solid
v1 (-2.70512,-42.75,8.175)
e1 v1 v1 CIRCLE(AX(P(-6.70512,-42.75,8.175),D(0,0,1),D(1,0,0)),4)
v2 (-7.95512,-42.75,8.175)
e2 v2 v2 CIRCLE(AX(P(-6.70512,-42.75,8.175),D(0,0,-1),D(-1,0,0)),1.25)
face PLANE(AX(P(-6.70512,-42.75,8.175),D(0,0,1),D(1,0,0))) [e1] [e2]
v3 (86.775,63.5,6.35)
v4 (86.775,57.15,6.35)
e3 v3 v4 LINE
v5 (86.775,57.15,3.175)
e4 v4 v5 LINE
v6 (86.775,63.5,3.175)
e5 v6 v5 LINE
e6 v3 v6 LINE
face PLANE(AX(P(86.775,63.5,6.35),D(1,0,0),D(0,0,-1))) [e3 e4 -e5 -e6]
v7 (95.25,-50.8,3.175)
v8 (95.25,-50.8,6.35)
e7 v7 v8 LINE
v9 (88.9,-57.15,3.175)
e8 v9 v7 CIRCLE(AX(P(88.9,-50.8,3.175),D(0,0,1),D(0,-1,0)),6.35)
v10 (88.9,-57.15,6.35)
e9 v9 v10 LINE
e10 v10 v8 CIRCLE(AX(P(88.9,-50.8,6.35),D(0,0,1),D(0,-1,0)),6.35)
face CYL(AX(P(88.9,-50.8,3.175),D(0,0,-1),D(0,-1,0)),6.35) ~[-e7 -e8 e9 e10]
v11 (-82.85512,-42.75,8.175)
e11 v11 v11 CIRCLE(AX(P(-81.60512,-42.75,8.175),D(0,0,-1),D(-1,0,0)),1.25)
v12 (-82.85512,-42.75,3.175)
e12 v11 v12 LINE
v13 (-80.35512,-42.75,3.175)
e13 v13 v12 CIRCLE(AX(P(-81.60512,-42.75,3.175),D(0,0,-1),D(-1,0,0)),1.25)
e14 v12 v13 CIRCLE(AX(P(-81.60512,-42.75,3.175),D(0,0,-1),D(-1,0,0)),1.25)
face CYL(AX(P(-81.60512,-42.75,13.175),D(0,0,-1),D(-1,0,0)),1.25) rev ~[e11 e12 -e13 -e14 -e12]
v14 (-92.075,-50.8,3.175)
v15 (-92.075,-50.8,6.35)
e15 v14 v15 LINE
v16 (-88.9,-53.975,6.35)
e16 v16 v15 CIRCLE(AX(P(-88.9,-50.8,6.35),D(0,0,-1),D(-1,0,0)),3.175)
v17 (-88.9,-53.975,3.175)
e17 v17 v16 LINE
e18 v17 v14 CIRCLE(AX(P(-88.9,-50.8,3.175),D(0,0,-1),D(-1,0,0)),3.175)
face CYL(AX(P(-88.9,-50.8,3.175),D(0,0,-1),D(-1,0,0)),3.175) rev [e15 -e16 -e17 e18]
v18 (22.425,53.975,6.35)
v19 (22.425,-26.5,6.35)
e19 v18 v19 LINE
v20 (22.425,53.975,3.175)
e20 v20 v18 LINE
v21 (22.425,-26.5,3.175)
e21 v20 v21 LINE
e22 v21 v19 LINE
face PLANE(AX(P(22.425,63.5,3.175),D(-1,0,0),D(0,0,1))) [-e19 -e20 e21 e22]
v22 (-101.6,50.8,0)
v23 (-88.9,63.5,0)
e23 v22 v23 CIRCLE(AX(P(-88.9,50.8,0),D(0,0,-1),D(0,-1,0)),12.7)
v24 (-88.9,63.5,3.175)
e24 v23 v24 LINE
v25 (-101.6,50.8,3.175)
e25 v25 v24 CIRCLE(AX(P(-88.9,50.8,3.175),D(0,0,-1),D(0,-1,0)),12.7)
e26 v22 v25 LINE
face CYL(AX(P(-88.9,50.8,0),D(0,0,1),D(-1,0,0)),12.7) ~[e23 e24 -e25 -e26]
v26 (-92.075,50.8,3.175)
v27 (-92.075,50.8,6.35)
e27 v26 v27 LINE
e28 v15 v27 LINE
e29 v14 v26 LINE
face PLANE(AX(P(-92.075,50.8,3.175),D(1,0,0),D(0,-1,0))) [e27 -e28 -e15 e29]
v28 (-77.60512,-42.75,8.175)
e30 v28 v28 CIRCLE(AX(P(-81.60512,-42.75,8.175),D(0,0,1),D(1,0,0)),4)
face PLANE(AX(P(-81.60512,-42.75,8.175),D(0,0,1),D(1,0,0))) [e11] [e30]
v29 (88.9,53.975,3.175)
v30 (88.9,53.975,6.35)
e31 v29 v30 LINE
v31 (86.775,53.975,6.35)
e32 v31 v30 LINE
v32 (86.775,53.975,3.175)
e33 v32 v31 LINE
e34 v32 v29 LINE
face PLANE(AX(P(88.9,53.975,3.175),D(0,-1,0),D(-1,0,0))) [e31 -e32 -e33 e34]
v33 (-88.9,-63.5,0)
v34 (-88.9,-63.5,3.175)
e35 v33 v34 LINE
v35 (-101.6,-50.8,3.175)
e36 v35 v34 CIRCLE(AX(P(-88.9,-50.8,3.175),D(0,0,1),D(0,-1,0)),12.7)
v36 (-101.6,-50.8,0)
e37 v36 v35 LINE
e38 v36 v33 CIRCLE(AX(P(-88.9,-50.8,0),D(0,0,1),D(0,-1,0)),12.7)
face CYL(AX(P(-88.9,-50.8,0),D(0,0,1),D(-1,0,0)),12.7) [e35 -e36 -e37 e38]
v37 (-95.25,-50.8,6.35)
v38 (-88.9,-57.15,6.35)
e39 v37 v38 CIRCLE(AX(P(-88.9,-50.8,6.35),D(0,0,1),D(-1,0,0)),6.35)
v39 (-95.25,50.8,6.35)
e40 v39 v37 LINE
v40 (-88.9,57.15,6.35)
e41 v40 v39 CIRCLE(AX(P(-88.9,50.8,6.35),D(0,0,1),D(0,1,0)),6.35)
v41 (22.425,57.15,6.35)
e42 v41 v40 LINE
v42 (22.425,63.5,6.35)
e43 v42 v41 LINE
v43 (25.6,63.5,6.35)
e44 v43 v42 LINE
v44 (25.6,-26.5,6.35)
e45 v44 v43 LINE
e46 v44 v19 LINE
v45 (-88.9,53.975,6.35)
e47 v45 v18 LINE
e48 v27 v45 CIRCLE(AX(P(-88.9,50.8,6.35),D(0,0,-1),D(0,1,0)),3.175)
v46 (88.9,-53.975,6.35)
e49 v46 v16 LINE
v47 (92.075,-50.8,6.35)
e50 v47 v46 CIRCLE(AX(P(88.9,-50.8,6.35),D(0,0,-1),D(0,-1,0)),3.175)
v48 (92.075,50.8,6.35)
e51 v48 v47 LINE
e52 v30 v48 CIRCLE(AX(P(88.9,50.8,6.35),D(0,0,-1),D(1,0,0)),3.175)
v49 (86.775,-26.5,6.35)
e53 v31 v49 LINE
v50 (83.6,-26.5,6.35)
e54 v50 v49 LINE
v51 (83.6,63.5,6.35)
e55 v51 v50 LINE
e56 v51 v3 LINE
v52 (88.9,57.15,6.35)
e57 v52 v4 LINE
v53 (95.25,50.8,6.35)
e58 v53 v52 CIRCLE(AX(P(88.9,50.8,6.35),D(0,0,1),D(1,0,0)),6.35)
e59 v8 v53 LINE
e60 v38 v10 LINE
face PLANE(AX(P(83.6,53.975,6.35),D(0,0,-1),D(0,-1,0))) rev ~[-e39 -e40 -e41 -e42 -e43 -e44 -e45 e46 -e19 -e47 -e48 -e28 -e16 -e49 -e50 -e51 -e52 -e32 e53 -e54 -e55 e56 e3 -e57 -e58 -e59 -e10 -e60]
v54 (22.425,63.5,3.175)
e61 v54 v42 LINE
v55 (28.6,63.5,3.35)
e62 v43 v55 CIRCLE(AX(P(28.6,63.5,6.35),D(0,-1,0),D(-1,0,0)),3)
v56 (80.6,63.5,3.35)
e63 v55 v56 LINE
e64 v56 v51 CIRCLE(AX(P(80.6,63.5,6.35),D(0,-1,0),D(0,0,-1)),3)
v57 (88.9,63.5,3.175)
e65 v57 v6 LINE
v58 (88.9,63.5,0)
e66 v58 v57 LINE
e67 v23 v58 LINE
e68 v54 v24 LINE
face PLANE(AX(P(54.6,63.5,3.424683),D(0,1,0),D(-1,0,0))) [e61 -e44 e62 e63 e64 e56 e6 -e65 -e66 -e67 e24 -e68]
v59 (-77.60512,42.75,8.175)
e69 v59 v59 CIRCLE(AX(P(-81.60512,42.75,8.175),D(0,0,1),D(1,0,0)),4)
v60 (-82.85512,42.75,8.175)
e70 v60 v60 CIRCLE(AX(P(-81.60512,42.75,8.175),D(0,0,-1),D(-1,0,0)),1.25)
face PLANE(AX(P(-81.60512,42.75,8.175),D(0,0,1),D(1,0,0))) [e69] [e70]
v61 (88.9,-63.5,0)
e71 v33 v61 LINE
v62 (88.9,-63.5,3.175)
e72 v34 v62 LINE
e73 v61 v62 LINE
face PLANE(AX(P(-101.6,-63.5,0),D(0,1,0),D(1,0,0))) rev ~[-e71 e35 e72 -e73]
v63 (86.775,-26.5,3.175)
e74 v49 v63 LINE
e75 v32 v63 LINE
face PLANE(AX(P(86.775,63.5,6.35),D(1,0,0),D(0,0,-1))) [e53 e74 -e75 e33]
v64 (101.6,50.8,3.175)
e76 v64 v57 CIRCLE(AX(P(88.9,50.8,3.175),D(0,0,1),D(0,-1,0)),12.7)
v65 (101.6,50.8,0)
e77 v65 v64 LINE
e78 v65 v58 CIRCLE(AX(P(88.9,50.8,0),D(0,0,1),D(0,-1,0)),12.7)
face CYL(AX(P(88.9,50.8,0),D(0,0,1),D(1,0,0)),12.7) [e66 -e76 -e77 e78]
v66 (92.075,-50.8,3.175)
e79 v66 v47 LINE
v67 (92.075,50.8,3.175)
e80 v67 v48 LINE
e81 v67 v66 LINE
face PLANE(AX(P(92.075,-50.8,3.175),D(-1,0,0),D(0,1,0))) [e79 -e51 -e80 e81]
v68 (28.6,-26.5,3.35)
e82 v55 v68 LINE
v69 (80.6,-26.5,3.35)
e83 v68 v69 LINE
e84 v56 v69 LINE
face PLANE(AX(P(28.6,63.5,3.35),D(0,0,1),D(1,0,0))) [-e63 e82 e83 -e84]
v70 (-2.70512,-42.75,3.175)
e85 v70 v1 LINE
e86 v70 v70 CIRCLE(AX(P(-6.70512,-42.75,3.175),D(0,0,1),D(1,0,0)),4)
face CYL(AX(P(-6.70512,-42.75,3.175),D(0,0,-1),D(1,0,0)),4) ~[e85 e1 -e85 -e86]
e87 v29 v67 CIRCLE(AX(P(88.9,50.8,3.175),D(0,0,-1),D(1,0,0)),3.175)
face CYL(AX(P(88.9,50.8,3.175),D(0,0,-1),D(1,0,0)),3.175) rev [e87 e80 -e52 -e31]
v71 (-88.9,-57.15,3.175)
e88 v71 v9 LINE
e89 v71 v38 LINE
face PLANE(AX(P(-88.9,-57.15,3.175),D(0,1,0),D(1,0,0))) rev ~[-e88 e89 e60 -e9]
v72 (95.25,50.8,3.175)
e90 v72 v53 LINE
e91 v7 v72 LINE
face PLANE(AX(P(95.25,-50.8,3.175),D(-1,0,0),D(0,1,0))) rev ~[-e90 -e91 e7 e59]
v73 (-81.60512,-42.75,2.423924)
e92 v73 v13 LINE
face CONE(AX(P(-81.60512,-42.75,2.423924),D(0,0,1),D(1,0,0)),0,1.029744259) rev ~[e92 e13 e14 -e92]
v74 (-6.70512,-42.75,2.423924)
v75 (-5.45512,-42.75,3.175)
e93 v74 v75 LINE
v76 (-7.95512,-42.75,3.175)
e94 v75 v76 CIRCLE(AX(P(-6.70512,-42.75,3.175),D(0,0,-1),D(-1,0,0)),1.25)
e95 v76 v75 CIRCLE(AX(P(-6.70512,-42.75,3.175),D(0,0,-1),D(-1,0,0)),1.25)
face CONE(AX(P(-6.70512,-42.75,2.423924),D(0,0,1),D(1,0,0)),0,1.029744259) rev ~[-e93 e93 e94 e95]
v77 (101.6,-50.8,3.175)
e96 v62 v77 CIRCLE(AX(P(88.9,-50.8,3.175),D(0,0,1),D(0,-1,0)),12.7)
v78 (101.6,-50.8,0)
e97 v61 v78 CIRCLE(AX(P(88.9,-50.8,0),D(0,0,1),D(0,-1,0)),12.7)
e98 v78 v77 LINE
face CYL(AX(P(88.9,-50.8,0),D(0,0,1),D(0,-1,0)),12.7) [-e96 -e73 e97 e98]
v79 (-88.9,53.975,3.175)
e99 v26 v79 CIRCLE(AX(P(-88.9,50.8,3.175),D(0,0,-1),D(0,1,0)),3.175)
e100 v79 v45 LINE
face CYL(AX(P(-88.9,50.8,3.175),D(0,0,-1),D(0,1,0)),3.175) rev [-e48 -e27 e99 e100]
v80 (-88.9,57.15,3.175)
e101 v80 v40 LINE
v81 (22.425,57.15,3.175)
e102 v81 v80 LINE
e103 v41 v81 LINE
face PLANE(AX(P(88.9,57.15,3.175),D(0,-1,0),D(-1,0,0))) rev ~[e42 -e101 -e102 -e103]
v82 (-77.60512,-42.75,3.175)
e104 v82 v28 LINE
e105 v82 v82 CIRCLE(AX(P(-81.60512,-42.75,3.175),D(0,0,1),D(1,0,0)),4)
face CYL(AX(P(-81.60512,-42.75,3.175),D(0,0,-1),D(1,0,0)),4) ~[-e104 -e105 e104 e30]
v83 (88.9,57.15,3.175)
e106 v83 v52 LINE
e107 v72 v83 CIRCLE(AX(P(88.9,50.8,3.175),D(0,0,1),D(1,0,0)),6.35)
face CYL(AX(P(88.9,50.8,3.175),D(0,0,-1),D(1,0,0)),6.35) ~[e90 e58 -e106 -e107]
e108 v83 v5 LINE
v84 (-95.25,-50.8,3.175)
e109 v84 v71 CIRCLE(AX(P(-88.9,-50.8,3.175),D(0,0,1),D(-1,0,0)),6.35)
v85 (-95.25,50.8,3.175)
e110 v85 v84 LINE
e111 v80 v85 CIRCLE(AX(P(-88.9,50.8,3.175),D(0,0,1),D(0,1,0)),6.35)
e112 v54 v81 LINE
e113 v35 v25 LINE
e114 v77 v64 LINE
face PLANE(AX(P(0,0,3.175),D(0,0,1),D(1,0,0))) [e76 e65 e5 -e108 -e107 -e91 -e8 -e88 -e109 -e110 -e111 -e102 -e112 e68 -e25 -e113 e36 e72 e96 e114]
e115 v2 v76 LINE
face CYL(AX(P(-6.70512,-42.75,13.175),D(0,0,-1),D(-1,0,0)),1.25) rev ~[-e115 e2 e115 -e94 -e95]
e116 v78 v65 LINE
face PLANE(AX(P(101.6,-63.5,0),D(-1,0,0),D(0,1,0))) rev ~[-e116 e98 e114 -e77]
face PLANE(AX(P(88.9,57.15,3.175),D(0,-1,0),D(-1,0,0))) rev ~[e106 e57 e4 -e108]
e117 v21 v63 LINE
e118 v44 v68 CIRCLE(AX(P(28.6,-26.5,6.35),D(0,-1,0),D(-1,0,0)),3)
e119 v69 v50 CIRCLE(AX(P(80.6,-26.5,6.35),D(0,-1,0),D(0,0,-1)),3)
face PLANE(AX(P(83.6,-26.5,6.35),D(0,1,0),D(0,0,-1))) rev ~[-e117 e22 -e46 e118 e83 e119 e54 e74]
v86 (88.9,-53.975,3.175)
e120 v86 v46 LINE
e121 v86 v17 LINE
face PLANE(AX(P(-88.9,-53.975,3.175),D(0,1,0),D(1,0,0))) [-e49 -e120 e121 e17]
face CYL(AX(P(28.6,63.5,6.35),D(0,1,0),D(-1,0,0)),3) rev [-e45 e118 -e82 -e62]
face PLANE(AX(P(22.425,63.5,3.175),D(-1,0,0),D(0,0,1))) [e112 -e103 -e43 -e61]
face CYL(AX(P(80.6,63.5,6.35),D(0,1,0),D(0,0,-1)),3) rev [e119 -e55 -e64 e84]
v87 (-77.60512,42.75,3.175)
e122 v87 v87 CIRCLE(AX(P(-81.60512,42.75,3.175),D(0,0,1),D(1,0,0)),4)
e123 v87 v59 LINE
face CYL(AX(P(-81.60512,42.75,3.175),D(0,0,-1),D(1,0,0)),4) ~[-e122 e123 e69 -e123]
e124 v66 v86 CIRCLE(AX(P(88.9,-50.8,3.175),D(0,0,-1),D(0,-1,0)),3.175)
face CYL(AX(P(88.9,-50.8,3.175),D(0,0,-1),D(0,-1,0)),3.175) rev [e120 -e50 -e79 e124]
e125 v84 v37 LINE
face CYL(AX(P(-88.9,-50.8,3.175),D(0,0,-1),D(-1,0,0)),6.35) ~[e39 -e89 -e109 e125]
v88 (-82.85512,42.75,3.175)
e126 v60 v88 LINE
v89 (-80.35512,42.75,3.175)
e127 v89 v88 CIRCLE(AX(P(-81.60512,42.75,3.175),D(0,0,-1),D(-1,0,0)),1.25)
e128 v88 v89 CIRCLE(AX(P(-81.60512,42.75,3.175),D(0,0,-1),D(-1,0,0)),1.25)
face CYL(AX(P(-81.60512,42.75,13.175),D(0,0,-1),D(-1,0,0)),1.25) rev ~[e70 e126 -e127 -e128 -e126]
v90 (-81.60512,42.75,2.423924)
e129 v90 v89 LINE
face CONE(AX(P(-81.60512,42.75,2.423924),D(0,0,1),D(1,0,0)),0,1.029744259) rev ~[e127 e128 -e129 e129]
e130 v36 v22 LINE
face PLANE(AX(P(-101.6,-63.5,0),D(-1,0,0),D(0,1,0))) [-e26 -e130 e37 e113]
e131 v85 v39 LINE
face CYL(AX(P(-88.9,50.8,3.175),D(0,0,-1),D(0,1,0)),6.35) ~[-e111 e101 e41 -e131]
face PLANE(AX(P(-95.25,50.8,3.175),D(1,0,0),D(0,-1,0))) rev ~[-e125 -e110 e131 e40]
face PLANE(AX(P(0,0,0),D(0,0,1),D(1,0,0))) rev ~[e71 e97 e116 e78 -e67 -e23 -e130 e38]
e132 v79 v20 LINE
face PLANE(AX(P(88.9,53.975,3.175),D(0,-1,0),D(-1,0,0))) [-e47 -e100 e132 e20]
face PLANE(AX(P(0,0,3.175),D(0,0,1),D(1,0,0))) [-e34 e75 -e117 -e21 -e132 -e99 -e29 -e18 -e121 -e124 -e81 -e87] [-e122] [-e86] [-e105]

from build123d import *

# Parameters (mm, degrees)
F0_W             = 203.2
F0_H             = 127
F1_DEPTH         = 3.175
F2_R             = 12.7
F4_DEPTH         = 3.175
F5_T             = -3.175
F6_W             = 58
F6_H             = 9.525
F7_DEPTH         = 3.176
F9_DEPTH         = 90
F10_DEPTH        = 3.175
F11_DEPTH        = 3.175
F12_R            = 4
F13_DEPTH        = 5
F17_D            = 2.5
F17_DEPTH        = 5
F17_TIP          = 0.7510757738
F17_ON_F15_D     = 2.5
F17_ON_F15_DEPTH = 5
F17_ON_F15_TIP   = 0.7510757738
F17_ON_F16_D     = 2.5
F17_ON_F16_DEPTH = 5
F17_ON_F16_TIP   = 0.7510757738


# Not quite as in the source:
# - a feature names something its author has since deleted; it is built from what else it names


with BuildPart() as f1:
    # F0 (on Top) → F1 (new body)
    with BuildSketch(Plane.XY):
        Rectangle(F0_W, F0_H)
    extrude(amount=F1_DEPTH)

    # F2
    f2_edges = [f1.edges().sort_by_distance(p)[0] for p in [
        (-101.6, -63.5, 1.5875),
        (-101.6, 63.5, 1.5875),
        (101.6, -63.5, 1.5875),
        (101.6, 63.5, 1.5875),
    ]]
    fillet(f2_edges, radius=F2_R)

    # F3 (on face) → F4 (join)
    with BuildSketch(Plane.XY.offset(3.175)):
        with BuildLine():
            Line((88.9, 57.15), (-88.9, 57.15))
            ThreePointArc((-88.9, 57.15), (-93.3901280605, 55.2901280605), (-95.25, 50.8))
            Line((-95.25, 50.8), (-95.25, -50.8))
            ThreePointArc((-95.25, -50.8), (-93.3901280605, -55.2901280605), (-88.9, -57.15))
            Line((-88.9, -57.15), (88.9, -57.15))
            ThreePointArc((88.9, -57.15), (93.3901280605, -55.2901280605), (95.25, -50.8))
            Line((95.25, -50.8), (95.25, 50.8))
            ThreePointArc((95.25, 50.8), (93.3901280605, 55.2901280605), (88.9, 57.15))
        make_face()
    extrude(amount=F4_DEPTH)

    # F5
    f5_openings = [f1.faces().sort_by_distance(p)[0] for p in [
        (0, 0, 6.35),
    ]]
    offset(amount=F5_T, openings=f5_openings, kind=Kind.INTERSECTION)

    # F6 (on face) → F7 (cut, through all)
    with BuildSketch(Plane.XY.offset(3.175)):
        with Locations((54.6, 58.7375)):
            Rectangle(F6_W, F6_H)
    extrude(amount=F7_DEPTH, mode=Mode.SUBTRACT)

    # F8 (on face) → F9 (join)
    with BuildSketch(Plane(origin=(0, 63.5, 0), x_dir=(-1, 0, 0), z_dir=(0, 1, 0))):
        with BuildLine():
            Line((-83.6, 6.35), (-83.6, 3.175))
            Line((-83.6, 3.175), (-25.6, 3.175))
            Line((-25.6, 3.175), (-25.6, 6.35))
            ThreePointArc((-25.6, 6.35), (-26.4786796564, 4.2286796564), (-28.6, 3.35))
            Line((-28.6, 3.35), (-80.6, 3.35))
            ThreePointArc((-80.6, 3.35), (-82.7213203436, 4.2286796564), (-83.6, 6.35))
        make_face()
    extrude(amount=-F9_DEPTH)

    # F10 (add): faces of the model
    f10_faces = [f1.faces().sort_by_distance(p)[0] for p in [
        (25.6, 13.7375, 4.7625),
        (25.6, 60.325, 4.7625),
    ]]
    extrude(f10_faces, amount=F10_DEPTH)

    # F11 (add): faces of the model
    f11_faces = [f1.faces().sort_by_distance(p)[0] for p in [
        (83.6, 13.7375, 4.7625),
        (83.6, 60.325, 4.7625),
    ]]
    extrude(f11_faces, amount=F11_DEPTH)

    # F12 (on face) → F13 (join)
    with BuildSketch(Plane.XY.offset(3.175)):
        with Locations((-81.6051200401, -42.75)):
            Circle(F12_R)
        with Locations((-6.7051200401, -42.75)):
            Circle(F12_R)
        with Locations((-81.6051200401, 42.75)):
            Circle(F12_R)
    extrude(amount=F13_DEPTH)

    # F17
    with Locations(Plane.XY.offset(8.175)):
        with Locations((-81.6051200401, 42.75)):
            Hole(F17_D / 2, depth=F17_DEPTH)
            with Locations((0, 0, -(F17_DEPTH + F17_TIP / 2))):  # 118° drill point
                Cone(0, F17_D / 2, F17_TIP, mode=Mode.SUBTRACT)

    # F17 on F15
    with Locations(Plane.XY.offset(8.175)):
        with Locations((-81.6051200401, -42.75)):
            Hole(F17_ON_F15_D / 2, depth=F17_ON_F15_DEPTH)
            with Locations((0, 0, -(F17_ON_F15_DEPTH + F17_ON_F15_TIP / 2))):  # 118° drill point
                Cone(0, F17_ON_F15_D / 2, F17_ON_F15_TIP, mode=Mode.SUBTRACT)

    # F17 on F16
    with Locations(Plane.XY.offset(8.175)):
        with Locations((-6.7051200401, -42.75)):
            Hole(F17_ON_F16_D / 2, depth=F17_ON_F16_DEPTH)
            with Locations((0, 0, -(F17_ON_F16_DEPTH + F17_ON_F16_TIP / 2))):  # 118° drill point
                Cone(0, F17_ON_F16_D / 2, F17_ON_F16_TIP, mode=Mode.SUBTRACT)


solid = f1.part
